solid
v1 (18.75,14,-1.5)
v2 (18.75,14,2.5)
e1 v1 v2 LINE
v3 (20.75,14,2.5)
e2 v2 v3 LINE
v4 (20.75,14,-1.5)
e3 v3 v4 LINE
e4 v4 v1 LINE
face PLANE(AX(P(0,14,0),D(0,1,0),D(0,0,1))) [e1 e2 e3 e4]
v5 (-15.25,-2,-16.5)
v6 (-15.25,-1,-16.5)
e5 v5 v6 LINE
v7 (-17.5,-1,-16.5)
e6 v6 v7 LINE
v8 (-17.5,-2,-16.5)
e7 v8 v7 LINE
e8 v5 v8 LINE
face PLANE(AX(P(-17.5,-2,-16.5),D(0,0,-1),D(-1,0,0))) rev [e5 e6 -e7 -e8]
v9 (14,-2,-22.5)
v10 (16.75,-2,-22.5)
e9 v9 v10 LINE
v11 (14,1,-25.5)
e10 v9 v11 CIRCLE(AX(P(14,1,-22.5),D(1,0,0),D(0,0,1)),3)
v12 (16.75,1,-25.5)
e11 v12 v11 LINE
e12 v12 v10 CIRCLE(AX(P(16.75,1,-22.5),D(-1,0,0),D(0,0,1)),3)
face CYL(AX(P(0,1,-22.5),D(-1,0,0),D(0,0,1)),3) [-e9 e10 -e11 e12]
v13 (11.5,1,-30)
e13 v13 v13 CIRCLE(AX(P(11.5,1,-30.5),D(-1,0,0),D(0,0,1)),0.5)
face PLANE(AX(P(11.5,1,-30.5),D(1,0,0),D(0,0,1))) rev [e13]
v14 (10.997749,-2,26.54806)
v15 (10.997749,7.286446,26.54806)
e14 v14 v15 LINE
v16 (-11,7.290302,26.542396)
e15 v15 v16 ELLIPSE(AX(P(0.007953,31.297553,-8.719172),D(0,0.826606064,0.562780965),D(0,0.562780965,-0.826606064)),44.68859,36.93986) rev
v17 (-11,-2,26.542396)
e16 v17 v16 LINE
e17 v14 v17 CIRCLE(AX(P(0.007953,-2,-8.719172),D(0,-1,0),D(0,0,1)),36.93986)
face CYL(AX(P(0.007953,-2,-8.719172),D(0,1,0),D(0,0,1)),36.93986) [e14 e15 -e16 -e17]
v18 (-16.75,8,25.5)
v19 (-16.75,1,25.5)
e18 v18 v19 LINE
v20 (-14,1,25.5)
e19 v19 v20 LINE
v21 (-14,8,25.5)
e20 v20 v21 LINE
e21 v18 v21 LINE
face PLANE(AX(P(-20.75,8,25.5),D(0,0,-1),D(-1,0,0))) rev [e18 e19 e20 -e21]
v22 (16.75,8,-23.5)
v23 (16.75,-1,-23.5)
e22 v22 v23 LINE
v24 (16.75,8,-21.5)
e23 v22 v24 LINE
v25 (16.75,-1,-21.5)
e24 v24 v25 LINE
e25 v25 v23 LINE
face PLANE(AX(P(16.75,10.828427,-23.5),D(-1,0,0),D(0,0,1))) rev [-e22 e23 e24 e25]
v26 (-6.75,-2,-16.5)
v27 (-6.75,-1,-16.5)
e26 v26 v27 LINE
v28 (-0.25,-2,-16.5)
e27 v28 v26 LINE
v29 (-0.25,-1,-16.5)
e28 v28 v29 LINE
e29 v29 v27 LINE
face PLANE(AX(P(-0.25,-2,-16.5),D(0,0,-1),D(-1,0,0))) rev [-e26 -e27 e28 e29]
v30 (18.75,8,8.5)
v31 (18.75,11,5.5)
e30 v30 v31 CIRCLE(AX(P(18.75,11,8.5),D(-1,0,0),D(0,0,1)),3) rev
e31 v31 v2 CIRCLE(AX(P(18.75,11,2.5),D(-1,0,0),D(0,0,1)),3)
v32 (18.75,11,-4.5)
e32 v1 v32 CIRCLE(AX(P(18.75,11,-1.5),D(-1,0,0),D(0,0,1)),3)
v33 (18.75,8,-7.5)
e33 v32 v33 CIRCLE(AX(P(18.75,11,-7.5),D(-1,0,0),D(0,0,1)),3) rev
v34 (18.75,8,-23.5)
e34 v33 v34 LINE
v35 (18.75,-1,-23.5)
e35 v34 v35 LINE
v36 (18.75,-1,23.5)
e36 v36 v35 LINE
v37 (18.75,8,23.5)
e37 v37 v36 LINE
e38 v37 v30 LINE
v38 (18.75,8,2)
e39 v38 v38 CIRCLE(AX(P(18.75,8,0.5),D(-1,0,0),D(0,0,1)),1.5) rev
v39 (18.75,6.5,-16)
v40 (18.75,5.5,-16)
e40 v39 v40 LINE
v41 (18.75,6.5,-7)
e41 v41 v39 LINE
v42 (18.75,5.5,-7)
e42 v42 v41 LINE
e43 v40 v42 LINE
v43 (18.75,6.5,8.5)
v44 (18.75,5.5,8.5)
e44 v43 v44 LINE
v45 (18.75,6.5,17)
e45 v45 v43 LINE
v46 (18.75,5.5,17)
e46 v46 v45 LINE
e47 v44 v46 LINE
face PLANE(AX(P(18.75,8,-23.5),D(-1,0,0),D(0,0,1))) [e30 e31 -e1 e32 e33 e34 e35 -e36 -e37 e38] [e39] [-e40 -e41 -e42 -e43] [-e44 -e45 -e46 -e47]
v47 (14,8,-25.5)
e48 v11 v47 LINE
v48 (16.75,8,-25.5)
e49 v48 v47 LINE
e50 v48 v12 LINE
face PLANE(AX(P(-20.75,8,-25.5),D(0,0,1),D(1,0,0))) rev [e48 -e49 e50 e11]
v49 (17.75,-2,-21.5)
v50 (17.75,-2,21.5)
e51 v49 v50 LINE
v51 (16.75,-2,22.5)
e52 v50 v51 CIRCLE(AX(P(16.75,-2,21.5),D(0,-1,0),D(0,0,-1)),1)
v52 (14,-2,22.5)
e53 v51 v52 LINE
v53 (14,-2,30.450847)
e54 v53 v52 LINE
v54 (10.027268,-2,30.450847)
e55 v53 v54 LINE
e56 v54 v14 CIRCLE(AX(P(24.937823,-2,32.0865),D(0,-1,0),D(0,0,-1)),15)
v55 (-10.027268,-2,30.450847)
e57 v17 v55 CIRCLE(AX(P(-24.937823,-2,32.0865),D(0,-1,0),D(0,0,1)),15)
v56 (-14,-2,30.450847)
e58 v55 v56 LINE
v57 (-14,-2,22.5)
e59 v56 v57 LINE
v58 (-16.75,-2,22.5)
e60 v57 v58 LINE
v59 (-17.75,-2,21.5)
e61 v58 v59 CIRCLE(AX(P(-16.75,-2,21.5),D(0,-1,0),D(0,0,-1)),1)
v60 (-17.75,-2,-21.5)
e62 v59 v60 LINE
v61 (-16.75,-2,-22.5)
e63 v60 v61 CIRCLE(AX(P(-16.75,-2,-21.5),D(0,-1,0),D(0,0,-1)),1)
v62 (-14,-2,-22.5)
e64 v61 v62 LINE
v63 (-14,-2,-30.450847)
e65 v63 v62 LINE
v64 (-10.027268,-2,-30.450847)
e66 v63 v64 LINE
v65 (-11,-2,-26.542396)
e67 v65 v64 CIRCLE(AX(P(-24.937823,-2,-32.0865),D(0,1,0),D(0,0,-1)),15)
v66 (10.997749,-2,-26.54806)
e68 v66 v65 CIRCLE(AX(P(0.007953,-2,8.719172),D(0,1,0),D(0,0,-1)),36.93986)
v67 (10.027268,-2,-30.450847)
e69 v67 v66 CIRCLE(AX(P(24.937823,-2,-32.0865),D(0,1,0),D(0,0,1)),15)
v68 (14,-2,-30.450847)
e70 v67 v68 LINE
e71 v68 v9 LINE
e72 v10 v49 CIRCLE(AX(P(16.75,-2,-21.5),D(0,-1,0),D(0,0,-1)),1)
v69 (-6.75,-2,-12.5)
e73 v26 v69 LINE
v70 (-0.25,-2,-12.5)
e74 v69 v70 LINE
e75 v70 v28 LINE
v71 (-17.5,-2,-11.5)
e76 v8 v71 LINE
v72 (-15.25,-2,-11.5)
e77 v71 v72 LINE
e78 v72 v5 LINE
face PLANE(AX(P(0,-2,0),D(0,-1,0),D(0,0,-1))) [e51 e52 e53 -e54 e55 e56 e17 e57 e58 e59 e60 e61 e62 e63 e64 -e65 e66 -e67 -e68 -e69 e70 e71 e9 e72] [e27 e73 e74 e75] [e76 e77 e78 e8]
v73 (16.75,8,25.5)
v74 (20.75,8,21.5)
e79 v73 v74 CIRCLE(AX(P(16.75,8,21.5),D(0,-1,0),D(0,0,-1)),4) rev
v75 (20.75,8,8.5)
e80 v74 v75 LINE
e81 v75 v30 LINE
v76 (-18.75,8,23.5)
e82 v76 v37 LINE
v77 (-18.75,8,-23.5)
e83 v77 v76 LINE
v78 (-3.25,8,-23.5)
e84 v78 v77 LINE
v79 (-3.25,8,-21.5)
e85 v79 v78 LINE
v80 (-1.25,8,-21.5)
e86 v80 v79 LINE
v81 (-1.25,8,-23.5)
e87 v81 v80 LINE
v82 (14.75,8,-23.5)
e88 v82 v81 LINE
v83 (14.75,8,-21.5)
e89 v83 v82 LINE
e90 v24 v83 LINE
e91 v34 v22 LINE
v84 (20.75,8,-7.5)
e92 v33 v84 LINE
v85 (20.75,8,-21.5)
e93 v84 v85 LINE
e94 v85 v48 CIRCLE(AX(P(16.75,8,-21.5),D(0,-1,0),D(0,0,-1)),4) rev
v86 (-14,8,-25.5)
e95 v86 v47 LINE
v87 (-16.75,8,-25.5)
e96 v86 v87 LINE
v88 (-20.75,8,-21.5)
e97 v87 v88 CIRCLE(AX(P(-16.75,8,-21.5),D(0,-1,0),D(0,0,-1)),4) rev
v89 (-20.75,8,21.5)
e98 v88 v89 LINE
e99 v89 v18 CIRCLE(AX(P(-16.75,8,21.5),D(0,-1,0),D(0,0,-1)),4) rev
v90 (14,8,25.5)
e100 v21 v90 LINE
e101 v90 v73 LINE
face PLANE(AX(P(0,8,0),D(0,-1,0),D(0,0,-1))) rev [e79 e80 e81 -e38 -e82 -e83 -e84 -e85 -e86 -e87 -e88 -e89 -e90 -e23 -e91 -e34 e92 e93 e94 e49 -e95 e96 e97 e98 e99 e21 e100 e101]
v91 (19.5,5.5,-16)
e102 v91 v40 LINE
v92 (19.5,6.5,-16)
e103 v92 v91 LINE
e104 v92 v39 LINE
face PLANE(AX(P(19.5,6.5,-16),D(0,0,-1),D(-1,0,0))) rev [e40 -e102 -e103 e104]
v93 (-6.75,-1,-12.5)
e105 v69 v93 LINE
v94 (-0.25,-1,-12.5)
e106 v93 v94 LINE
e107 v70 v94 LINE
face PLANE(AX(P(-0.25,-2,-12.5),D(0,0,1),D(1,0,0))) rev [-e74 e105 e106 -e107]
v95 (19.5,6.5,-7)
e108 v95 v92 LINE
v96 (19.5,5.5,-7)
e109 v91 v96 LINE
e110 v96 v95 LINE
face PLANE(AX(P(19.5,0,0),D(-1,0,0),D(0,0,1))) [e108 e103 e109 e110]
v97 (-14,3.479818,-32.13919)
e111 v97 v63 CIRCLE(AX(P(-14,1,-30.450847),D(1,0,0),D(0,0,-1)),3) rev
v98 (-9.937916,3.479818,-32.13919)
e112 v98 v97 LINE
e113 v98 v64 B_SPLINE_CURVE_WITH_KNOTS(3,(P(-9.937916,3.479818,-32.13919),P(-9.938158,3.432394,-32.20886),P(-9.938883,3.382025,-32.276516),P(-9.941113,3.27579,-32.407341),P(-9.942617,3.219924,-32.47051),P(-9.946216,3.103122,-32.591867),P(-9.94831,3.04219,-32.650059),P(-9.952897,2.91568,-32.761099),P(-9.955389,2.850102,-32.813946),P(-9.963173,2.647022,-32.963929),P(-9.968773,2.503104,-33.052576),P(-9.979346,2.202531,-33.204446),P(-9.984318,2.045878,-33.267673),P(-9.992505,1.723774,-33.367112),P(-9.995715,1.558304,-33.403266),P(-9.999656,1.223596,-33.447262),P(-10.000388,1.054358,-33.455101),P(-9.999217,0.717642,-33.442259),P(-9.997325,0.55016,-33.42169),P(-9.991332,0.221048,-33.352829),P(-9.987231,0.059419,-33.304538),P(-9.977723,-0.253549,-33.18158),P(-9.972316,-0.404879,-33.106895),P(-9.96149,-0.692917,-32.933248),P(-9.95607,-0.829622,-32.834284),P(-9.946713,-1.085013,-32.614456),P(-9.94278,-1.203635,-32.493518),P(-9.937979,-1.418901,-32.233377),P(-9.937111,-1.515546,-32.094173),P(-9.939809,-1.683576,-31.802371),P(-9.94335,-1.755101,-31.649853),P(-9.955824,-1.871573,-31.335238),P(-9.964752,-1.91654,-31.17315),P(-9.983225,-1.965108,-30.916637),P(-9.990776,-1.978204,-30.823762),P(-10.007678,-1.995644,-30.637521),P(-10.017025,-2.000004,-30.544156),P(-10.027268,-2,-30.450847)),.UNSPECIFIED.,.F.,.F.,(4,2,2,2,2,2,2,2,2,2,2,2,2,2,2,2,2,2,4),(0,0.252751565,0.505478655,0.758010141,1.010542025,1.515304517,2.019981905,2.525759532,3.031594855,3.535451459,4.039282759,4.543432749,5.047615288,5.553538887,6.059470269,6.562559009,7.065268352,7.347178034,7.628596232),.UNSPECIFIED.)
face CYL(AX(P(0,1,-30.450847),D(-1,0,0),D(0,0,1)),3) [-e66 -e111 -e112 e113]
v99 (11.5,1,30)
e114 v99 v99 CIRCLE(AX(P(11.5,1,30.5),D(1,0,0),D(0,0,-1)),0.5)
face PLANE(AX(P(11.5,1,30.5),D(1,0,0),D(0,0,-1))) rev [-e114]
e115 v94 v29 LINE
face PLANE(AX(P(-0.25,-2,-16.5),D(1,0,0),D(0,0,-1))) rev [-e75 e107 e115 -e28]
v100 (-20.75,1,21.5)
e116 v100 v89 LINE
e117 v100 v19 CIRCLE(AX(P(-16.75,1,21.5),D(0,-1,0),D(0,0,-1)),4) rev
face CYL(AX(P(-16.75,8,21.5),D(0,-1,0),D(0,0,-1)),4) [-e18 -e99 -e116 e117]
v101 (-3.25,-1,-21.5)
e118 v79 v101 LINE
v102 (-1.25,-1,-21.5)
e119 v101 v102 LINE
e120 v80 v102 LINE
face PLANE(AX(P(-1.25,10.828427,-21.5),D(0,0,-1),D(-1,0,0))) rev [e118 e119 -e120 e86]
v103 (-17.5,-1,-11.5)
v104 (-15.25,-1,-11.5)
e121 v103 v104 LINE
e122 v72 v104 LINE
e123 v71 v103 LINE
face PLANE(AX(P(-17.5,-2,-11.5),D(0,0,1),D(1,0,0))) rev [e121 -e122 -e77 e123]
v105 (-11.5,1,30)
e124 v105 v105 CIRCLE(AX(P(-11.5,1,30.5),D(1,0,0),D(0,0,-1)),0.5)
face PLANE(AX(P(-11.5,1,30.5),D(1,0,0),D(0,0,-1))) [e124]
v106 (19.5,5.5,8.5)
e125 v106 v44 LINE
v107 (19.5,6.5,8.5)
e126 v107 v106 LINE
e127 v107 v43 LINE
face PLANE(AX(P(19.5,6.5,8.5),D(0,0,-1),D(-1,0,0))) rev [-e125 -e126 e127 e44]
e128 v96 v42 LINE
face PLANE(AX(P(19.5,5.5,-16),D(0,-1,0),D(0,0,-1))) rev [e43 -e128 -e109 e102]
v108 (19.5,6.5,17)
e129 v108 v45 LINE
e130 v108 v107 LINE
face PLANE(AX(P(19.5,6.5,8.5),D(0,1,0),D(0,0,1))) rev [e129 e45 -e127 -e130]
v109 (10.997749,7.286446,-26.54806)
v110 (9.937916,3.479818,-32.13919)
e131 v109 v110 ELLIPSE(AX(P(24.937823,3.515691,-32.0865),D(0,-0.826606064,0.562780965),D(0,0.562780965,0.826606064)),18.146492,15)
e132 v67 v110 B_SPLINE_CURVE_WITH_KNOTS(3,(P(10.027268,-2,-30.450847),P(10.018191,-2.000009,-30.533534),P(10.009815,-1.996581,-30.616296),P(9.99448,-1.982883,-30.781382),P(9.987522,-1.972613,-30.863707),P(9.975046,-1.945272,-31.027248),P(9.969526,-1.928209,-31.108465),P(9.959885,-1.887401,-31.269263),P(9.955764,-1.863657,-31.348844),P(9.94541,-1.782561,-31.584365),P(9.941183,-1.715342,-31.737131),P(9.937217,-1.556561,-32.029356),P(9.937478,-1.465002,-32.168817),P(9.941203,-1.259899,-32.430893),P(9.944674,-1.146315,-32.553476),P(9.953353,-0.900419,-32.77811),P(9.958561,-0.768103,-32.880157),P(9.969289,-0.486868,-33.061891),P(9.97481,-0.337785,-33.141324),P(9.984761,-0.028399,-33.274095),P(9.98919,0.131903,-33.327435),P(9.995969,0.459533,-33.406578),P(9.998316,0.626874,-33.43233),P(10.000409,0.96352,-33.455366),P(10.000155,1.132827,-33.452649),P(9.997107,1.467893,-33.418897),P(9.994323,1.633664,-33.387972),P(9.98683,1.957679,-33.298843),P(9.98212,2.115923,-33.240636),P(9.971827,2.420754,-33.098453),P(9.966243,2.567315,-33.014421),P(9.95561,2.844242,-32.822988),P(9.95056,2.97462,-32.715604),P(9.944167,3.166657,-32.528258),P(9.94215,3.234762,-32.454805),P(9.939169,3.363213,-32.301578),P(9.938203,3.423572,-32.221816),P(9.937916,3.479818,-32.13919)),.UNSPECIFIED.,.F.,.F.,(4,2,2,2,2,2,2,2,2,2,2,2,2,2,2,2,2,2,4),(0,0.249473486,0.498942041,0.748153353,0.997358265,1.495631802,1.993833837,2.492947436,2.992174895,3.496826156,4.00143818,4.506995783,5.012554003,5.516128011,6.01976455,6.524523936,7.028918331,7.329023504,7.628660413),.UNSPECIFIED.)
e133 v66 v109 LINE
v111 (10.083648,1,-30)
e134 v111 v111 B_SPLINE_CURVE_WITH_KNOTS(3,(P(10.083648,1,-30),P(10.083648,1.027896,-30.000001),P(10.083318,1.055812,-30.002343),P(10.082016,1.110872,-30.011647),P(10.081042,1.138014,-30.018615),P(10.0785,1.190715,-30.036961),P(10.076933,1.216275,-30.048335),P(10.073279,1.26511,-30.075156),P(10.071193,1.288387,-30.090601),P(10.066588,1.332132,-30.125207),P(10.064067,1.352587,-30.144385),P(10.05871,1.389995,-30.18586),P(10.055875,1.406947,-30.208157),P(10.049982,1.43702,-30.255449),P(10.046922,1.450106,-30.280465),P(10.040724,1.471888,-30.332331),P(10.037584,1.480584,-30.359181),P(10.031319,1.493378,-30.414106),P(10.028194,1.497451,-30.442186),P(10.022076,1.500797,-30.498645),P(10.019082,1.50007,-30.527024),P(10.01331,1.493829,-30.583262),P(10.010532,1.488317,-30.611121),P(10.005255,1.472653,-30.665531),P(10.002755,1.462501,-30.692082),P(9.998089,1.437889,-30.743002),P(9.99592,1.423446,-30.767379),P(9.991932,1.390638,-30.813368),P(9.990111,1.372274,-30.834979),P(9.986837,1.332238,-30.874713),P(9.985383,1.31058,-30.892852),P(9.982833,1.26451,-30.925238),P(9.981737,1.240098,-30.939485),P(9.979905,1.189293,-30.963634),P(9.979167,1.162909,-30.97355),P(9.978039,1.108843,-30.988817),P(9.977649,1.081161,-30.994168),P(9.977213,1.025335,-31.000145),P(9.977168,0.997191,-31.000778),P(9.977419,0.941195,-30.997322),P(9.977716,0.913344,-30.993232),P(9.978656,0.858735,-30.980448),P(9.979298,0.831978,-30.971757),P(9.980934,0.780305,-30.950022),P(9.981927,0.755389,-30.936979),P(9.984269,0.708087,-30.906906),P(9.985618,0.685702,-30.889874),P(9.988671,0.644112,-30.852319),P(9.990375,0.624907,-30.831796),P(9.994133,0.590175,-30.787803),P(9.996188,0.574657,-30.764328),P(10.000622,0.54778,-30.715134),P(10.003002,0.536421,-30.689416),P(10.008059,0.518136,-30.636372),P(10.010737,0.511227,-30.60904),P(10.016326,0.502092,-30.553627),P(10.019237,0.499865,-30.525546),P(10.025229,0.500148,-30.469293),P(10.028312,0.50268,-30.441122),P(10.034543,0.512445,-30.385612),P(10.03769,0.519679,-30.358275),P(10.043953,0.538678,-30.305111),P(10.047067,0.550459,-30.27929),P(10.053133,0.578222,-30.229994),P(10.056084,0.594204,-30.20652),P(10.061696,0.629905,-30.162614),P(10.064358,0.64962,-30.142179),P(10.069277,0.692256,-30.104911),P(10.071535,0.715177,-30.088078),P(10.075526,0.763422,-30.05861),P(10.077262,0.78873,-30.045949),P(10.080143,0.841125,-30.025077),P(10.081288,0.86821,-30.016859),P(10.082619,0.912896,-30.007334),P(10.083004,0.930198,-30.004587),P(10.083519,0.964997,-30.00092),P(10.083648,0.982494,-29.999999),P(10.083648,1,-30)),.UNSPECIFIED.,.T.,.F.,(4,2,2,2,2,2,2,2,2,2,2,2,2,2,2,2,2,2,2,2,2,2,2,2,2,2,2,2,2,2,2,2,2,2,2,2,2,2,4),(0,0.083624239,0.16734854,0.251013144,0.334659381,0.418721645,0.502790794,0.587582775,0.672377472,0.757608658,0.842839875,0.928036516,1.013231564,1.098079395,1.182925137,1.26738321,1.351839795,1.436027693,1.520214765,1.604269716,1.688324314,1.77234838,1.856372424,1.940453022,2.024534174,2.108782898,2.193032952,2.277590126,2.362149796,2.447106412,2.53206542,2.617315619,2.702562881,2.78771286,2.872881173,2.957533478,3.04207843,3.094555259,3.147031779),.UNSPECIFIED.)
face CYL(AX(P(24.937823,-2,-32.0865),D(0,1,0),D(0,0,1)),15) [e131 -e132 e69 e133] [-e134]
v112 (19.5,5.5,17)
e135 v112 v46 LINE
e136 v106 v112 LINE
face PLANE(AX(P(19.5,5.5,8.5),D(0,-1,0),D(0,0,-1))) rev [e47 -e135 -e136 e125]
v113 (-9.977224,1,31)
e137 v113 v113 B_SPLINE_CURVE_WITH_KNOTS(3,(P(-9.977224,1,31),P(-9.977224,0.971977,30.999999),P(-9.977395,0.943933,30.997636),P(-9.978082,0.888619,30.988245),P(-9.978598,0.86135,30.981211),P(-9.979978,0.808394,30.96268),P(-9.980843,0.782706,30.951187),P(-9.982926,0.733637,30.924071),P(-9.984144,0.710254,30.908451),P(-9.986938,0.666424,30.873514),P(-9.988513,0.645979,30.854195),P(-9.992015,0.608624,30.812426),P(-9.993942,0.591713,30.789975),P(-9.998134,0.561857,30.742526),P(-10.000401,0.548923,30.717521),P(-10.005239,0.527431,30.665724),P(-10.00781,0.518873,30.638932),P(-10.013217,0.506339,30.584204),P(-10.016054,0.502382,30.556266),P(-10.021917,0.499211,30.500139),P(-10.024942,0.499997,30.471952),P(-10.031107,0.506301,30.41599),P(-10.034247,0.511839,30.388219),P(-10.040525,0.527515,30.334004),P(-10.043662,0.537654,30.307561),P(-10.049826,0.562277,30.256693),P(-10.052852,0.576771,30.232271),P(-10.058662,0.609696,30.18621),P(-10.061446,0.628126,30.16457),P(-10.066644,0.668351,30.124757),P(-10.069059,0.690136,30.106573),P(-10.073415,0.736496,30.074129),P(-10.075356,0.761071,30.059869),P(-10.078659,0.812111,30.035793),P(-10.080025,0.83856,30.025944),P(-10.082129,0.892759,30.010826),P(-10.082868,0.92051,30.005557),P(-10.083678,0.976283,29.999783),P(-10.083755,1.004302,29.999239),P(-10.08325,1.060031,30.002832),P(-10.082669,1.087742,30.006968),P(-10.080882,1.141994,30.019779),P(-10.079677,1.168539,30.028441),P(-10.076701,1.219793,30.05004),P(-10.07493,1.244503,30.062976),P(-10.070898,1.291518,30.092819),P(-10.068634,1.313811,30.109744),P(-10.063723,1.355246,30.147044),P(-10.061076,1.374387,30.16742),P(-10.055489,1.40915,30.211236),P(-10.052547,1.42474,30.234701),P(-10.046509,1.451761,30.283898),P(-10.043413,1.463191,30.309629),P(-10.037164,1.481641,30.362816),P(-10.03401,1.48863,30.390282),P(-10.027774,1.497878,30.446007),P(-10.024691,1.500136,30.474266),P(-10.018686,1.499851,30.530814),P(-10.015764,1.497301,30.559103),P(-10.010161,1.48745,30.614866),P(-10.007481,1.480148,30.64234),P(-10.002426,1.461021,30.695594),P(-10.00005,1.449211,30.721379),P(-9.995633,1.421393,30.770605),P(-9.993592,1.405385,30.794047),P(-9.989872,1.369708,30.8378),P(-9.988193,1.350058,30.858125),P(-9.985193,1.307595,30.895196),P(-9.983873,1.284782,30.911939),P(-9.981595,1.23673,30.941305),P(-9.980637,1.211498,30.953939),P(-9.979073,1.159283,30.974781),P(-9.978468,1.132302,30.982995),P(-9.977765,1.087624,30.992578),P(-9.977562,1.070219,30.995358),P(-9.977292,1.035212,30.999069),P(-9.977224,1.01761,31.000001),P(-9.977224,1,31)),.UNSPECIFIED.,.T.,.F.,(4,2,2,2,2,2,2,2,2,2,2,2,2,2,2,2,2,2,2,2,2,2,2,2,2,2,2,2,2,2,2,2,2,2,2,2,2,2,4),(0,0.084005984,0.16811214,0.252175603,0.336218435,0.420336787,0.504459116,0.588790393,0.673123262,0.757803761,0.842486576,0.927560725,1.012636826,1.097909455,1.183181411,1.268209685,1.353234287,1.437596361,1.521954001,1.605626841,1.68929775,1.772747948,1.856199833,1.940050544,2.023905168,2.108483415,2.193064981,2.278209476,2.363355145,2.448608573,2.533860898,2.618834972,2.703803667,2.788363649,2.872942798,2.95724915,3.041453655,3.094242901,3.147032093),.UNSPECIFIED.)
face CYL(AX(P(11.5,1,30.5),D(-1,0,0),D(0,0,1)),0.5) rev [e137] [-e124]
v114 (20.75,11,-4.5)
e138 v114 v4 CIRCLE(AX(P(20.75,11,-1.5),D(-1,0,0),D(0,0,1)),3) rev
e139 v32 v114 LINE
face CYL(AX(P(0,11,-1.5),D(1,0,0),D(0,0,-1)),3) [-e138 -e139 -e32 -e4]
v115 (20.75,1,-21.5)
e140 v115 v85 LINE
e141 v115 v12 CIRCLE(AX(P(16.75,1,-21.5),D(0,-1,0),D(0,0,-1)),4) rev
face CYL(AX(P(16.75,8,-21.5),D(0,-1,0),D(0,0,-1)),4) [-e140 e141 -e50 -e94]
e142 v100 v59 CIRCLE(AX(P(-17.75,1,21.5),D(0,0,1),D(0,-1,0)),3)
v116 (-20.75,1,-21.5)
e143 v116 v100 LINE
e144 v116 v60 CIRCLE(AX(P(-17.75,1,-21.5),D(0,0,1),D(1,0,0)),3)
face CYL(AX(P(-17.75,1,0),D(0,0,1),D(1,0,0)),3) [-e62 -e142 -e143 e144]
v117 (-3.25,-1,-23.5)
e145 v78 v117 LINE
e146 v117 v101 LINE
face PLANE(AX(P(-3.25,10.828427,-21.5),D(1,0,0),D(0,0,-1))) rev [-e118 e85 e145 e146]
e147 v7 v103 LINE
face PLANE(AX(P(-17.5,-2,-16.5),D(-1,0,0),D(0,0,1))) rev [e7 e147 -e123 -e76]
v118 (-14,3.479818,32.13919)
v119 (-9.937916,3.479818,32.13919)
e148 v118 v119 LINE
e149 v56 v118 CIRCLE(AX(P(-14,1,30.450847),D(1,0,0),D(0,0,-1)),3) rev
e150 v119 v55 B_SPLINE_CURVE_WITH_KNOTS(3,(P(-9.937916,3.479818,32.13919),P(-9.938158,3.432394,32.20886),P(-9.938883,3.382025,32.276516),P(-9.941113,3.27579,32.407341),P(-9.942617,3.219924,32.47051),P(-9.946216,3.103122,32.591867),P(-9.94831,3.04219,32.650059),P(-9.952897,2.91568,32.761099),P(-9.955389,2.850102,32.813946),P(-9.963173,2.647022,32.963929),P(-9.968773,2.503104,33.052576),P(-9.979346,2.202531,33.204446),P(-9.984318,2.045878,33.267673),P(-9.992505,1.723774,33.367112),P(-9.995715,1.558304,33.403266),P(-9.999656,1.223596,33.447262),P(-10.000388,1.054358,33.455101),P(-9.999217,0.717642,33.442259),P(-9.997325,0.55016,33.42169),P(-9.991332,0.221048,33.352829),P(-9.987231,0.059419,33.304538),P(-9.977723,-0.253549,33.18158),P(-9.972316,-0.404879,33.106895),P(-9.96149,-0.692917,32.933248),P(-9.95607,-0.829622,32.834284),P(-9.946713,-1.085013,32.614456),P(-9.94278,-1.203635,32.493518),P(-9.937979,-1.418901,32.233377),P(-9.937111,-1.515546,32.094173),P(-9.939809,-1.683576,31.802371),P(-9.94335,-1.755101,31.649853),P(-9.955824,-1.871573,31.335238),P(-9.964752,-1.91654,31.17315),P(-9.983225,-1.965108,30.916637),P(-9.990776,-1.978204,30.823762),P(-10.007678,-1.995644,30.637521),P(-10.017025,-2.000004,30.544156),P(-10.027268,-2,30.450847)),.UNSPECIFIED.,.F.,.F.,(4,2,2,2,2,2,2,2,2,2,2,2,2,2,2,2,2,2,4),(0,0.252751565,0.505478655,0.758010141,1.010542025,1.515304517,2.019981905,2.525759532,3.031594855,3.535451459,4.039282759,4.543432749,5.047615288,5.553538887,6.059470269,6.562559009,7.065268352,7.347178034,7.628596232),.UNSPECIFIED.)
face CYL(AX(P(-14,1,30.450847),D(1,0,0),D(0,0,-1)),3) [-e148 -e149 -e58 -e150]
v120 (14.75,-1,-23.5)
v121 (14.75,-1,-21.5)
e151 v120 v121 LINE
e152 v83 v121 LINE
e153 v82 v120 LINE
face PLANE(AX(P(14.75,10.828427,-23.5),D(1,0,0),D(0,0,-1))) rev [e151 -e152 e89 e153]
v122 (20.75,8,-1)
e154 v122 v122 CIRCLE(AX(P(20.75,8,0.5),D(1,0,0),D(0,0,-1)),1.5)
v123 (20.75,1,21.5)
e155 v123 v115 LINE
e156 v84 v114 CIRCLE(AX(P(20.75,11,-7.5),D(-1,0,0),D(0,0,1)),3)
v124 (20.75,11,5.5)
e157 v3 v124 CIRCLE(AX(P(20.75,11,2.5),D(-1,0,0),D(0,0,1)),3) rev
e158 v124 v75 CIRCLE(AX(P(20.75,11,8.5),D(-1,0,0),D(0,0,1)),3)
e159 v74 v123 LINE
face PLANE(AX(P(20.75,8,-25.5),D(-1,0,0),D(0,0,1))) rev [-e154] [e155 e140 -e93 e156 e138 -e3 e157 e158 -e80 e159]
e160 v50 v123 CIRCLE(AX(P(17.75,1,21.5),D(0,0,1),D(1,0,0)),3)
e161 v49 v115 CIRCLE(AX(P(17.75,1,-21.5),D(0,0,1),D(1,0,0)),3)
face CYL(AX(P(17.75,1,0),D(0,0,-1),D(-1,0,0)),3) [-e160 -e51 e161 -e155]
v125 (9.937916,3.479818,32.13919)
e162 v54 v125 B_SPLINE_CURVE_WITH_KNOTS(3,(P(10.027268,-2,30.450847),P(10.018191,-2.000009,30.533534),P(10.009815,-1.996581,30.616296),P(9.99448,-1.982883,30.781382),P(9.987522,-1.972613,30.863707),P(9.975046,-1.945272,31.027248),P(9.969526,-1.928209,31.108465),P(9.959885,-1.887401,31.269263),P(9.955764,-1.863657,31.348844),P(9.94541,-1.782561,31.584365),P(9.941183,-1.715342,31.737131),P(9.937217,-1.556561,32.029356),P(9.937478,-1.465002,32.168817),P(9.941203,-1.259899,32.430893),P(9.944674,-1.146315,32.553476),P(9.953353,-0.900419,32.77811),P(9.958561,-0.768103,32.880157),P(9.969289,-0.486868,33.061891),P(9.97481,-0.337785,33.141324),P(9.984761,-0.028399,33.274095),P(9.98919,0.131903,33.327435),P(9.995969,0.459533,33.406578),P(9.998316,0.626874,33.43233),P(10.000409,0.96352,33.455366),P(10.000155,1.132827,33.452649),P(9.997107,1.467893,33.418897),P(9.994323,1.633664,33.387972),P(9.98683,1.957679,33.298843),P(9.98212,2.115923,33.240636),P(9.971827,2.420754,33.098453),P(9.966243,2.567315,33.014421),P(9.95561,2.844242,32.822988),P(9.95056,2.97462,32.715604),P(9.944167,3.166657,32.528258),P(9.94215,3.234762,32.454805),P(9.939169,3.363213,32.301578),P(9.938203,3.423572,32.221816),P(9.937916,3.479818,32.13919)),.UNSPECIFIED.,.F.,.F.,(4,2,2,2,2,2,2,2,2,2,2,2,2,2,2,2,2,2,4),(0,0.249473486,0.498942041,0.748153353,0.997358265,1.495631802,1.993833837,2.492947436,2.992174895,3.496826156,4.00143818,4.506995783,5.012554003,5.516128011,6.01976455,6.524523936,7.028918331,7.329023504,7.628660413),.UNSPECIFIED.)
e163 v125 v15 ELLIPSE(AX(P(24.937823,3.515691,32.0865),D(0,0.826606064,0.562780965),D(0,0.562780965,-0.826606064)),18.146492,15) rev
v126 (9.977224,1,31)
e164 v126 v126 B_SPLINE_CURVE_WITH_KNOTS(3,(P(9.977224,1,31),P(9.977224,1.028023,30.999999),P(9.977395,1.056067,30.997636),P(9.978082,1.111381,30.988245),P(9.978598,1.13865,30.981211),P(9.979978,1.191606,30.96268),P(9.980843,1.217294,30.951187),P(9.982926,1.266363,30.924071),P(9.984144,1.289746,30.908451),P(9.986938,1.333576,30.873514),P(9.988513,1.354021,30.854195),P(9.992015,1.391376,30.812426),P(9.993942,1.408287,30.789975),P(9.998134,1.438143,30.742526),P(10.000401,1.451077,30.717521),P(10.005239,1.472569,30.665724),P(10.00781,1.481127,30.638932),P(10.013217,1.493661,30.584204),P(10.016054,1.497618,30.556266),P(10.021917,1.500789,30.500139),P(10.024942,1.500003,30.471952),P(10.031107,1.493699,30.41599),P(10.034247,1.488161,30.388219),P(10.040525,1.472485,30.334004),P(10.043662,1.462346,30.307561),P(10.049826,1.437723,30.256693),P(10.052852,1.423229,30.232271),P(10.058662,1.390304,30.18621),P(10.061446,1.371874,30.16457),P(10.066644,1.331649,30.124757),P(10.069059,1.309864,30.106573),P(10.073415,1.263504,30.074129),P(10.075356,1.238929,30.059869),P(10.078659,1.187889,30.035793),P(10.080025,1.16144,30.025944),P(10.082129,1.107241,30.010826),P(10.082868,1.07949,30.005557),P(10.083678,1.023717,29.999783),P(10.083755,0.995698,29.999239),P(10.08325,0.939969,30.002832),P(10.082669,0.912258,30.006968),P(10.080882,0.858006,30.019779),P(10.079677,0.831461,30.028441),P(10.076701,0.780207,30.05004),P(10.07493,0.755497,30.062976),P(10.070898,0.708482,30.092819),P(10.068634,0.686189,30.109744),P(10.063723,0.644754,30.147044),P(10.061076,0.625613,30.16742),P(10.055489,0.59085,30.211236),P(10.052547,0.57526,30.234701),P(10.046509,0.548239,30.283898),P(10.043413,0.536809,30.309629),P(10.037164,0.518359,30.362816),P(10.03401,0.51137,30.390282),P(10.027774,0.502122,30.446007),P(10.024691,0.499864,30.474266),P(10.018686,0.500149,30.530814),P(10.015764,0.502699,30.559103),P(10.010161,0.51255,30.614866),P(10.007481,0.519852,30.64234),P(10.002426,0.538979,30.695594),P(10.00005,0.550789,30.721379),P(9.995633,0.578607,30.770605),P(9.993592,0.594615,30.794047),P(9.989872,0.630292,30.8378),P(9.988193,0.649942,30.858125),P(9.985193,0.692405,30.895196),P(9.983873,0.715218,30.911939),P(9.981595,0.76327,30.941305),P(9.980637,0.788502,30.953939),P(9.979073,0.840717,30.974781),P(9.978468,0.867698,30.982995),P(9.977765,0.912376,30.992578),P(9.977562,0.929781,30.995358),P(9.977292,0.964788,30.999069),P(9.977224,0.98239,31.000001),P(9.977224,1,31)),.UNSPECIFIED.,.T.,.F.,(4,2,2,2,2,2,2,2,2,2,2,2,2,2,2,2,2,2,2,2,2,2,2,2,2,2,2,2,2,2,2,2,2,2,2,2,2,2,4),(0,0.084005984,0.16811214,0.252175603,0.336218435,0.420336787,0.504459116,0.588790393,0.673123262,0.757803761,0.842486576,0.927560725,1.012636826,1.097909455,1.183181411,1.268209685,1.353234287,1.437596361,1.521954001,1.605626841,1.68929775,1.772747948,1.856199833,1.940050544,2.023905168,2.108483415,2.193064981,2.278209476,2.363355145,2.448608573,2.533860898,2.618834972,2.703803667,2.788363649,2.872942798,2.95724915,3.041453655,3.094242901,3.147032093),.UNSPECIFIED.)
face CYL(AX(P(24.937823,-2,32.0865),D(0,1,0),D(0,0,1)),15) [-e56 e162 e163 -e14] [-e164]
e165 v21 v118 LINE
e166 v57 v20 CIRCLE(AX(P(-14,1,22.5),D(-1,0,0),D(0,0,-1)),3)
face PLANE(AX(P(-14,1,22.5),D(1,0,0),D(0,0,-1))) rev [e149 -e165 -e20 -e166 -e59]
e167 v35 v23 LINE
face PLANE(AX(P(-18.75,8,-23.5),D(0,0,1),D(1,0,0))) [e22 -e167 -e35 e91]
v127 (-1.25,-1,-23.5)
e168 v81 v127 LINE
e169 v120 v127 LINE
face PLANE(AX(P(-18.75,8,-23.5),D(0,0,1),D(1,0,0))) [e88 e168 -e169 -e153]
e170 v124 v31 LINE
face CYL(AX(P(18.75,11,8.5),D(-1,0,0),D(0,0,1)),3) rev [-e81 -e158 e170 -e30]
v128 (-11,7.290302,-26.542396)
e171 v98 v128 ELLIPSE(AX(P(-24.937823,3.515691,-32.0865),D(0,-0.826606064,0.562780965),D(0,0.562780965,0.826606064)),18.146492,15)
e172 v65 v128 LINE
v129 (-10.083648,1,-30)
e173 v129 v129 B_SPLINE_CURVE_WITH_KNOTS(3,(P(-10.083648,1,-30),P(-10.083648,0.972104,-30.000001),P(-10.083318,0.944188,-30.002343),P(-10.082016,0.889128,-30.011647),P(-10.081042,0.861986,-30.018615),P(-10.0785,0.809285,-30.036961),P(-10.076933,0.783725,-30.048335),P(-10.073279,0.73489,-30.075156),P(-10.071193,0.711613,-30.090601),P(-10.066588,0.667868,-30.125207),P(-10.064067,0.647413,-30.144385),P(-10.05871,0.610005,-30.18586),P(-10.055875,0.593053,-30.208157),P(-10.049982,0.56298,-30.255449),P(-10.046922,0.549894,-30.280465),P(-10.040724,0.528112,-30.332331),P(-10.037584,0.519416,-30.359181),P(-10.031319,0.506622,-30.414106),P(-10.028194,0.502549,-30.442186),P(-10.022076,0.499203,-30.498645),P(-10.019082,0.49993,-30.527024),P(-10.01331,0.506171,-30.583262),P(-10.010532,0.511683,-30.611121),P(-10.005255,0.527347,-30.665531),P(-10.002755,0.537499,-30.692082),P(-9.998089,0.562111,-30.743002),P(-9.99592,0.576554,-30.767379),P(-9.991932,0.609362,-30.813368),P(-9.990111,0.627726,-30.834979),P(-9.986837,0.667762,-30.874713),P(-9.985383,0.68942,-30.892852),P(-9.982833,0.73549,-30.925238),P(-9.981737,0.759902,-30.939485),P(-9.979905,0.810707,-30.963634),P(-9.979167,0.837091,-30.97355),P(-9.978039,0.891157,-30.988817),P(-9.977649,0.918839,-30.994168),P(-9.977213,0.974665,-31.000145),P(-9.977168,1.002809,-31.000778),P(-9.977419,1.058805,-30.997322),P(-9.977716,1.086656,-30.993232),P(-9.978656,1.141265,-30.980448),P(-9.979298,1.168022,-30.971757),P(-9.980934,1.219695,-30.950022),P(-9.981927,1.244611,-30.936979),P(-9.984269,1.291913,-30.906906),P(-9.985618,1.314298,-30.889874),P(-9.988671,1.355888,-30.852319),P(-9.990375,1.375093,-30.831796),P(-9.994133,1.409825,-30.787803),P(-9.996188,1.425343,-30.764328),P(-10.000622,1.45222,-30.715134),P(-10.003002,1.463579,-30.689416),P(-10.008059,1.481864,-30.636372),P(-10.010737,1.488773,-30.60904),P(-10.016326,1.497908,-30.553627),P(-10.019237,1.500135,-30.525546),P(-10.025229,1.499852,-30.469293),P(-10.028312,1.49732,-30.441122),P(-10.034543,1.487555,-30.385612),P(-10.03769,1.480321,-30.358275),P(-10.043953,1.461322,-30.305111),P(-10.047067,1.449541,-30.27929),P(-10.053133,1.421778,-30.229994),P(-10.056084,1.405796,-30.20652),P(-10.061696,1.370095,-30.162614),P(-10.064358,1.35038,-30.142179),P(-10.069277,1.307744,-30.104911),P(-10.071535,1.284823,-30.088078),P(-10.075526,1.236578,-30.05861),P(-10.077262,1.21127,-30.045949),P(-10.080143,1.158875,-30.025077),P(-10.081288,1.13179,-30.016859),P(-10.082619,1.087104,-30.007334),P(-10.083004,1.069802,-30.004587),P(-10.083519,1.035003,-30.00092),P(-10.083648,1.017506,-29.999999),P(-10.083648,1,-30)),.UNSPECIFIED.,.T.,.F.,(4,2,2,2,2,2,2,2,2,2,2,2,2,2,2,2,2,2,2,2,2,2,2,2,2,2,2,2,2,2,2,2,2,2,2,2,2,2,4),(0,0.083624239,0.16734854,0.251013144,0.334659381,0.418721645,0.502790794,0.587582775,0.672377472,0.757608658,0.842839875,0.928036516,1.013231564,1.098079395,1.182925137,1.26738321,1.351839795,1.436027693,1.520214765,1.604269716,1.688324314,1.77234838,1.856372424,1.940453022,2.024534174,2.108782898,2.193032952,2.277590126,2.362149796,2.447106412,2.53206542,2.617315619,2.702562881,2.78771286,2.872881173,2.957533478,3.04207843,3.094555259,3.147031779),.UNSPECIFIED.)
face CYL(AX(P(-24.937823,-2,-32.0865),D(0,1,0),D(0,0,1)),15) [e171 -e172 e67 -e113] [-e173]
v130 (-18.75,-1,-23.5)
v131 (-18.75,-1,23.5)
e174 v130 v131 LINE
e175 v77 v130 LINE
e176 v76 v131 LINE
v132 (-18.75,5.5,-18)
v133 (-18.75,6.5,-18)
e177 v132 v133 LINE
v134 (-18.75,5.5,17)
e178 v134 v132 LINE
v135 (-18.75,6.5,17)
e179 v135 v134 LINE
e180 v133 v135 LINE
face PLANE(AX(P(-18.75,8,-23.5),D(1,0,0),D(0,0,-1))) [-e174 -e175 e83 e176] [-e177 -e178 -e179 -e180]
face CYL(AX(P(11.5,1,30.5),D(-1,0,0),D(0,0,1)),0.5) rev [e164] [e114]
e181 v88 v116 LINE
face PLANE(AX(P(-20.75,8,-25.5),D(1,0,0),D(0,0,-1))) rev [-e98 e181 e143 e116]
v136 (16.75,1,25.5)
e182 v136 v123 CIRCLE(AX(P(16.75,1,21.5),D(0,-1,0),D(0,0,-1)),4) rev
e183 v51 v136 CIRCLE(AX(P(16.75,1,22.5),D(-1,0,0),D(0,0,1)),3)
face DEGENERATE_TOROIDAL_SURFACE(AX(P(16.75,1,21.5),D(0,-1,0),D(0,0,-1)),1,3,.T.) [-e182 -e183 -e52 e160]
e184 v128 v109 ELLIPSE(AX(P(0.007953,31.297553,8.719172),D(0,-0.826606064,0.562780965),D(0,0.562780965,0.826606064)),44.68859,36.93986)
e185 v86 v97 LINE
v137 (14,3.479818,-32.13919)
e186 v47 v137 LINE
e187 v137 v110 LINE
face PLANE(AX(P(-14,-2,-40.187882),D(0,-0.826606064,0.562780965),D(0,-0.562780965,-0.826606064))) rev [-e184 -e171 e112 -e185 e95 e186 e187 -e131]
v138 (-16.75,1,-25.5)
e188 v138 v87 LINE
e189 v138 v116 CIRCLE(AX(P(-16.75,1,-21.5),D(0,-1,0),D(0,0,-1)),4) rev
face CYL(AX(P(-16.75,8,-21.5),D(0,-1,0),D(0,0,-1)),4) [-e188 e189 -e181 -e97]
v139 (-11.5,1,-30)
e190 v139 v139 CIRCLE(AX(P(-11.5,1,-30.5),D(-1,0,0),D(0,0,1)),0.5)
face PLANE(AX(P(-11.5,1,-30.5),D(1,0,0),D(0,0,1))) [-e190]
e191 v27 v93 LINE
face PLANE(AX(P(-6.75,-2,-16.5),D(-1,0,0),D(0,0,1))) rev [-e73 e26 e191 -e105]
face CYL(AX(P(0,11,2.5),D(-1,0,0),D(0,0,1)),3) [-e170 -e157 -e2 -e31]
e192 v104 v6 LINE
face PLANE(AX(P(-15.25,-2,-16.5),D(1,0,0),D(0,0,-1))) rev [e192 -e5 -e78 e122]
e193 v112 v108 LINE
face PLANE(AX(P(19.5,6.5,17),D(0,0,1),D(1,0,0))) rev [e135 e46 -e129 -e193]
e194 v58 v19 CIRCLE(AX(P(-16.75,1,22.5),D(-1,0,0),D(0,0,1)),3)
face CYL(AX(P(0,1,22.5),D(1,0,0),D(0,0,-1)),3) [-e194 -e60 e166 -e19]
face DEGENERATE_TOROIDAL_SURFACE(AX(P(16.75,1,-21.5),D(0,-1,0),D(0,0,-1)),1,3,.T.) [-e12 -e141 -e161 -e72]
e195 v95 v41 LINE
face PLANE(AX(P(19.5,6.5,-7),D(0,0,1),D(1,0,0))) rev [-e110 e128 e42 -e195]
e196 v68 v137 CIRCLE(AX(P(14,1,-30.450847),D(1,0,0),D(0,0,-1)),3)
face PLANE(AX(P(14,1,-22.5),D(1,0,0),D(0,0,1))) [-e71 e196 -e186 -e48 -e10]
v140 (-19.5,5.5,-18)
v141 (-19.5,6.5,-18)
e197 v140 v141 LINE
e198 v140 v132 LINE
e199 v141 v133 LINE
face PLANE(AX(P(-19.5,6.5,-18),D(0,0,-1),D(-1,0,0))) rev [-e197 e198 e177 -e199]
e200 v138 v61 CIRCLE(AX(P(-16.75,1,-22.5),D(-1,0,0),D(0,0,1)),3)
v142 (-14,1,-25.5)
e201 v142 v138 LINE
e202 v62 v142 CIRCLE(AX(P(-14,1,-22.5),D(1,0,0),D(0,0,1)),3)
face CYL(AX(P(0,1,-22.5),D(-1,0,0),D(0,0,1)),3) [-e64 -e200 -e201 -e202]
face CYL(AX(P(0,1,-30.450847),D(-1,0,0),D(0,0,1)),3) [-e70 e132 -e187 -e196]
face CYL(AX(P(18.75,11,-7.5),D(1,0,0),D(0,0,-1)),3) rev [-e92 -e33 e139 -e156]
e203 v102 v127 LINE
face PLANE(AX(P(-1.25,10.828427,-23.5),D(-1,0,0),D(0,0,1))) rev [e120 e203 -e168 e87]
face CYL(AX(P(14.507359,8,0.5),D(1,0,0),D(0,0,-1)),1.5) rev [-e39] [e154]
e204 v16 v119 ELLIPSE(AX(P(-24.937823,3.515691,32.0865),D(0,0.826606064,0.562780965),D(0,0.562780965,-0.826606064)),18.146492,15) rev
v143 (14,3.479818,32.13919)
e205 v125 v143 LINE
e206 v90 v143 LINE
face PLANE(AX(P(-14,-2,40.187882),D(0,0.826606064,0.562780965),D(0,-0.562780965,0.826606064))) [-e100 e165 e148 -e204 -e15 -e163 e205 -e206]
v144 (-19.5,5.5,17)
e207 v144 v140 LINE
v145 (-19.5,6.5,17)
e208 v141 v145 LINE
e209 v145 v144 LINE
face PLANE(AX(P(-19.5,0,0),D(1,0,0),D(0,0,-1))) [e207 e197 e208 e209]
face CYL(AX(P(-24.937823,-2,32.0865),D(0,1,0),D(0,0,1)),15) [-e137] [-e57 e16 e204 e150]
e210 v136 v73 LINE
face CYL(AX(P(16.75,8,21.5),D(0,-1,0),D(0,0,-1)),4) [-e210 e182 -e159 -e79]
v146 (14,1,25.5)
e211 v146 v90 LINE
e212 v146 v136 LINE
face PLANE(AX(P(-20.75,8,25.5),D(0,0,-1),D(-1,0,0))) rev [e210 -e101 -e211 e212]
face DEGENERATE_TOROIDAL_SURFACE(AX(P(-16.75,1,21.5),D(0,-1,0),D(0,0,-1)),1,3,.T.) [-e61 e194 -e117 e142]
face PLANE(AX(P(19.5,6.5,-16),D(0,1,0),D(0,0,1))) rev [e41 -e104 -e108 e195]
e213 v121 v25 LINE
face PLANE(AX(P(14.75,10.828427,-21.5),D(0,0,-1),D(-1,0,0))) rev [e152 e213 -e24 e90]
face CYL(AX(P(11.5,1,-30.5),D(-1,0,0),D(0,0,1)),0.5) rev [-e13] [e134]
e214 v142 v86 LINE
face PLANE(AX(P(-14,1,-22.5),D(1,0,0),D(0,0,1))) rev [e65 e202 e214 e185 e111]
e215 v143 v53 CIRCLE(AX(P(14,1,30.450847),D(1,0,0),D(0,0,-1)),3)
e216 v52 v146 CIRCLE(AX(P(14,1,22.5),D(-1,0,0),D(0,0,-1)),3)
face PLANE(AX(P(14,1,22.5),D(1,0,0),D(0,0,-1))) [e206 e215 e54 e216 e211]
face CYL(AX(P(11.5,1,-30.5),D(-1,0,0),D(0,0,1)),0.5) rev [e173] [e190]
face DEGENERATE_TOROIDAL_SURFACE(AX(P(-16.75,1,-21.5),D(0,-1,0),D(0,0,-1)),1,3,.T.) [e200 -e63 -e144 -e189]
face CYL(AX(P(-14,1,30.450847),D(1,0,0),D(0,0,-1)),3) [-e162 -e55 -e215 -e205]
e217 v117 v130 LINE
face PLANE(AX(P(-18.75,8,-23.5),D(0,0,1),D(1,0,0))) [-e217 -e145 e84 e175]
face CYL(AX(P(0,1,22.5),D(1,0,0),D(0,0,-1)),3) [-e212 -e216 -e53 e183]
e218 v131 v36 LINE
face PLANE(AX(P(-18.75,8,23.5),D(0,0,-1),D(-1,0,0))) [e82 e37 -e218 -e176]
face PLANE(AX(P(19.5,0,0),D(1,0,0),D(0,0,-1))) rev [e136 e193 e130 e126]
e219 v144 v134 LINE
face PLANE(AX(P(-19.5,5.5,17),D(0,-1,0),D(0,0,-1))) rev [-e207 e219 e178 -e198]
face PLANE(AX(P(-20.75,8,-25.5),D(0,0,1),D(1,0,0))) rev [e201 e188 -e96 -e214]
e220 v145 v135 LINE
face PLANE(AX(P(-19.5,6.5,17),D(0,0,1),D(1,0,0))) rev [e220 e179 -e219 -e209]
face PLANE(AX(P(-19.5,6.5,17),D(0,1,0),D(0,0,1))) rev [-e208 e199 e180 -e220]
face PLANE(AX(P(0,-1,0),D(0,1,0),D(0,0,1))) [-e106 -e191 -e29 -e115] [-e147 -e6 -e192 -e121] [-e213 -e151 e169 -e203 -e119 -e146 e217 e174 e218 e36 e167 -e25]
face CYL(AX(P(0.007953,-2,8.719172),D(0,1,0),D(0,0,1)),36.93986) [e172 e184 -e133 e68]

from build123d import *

# Parameters (mm, degrees)
SKETCH1_W            = 41.5
SKETCH1_H            = 51
SKETCH1_W_2          = 37.5
SKETCH1_H_2          = 47
BOSS_EXTRUDE1_DEPTH  = 8
SKETCH2_W            = 41.5
SKETCH2_H            = 51
BOSS_EXTRUDE2_DEPTH  = 2
FILLET1_R            = 4
FILLET2_R            = 3
SKETCH3_W            = 5.5
SKETCH3_H            = 20
BOSS_EXTRUDE3_DEPTH  = 6
SKETCH4_R            = 1.4
BOSS_EXTRUDE4_DEPTH  = 3.5
FILLET3_R            = 0.5
SKETCH5_W            = 6.5
SKETCH5_H            = 4
CUT_EXTRUDE1_DEPTH   = 34.835077952
SKETCH6_W            = 2
SKETCH6_H            = 10
BOSS_EXTRUDE6_DEPTH  = 6
FILLET4_R            = 3
SKETCH7_R            = 1.5
CUT_EXTRUDE2_DEPTH   = 2
SKETCH8_W            = 35
SKETCH8_H            = 1
CUT_EXTRUDE3_DEPTH   = 0.75
SKETCH9_W            = 9
SKETCH9_H            = 1
SKETCH9_W_2          = 8.5
CUT_EXTRUDE4_DEPTH   = 0.75
BOSS_EXTRUDE7_DEPTH  = 14
FILLET6_R            = 3
CUT_EXTRUDE5_DEPTH   = 42.779440692
MIRROR1_START        = 10.997748531
MIRROR1_DEPTH        = 3.002251469
MIRROR1_START_2      = -14
MIRROR1_2_DEPTH      = 2.9999999
MIRROR1_START_3      = -11.0000001
MIRROR1_3_DEPTH      = 21.997748631
MIRROR1_START_4      = -3
MIRROR1_4_DEPTH      = 10.290302021
SKETCH13_R           = 0.5
CUT_EXTRUDE6_DEPTH   = 11.5
CUT_EXTRUDE7_DEPTH   = 6
SKETCH15_W           = 4.2
SKETCH15_H           = 10.25
CUT_EXTRUDE8_DEPTH   = 42.779440772
SKETCH16_R           = 1.75
SKETCH16_R_2         = 0.5
BOSS_EXTRUDE8_DEPTH  = 3
CUT_EXTRUDE9_START   = -1
SKETCH17_W           = 37.5
SKETCH17_H           = 47
SKETCH17_R           = 1.75
SKETCH17_R_2         = 1.4
SKETCH17_W_2         = 4.2
SKETCH17_H_2         = 10.25
SKETCH17_W_3         = 6.5
SKETCH17_H_3         = 4
CUT_EXTRUDE9_DEPTH   = 1
CUT_EXTRUDE10_START  = -4.5
SKETCH18_R           = 1.4
CUT_EXTRUDE10_DEPTH  = 4.5
SKETCH19_W           = 4.2
SKETCH19_H           = 10.25
BOSS_EXTRUDE9_DEPTH  = 1
CUT_EXTRUDE11_START  = -4
SKETCH20_R           = 1.75
CUT_EXTRUDE11_DEPTH  = 4
SKETCH23_W           = 2.25
SKETCH23_H           = 5
CUT_EXTRUDE12_DEPTH  = 43.125071765
SKETCH26_W           = 2
SKETCH26_H           = 2
BOSS_EXTRUDE10_DEPTH = 9


with BuildPart() as part:
    # Sketch1 → Boss-Extrude1 (new body)
    with BuildSketch(Plane(origin=(0, 0, 0), x_dir=(1, 0, 0), z_dir=(0, 1, 0))):
        Rectangle(SKETCH1_W, SKETCH1_H)
        Rectangle(SKETCH1_W_2, SKETCH1_H_2, mode=Mode.SUBTRACT)
    extrude(amount=BOSS_EXTRUDE1_DEPTH)

    # Sketch2 → Boss-Extrude2 (add)
    with BuildSketch(Plane.XZ):
        Rectangle(SKETCH2_W, SKETCH2_H)
    extrude(amount=BOSS_EXTRUDE2_DEPTH)

    # Fillet1
    fillet1_edges = [part.edges().sort_by_distance(p)[0] for p in [
        (20.75, 3, -25.5),
        (20.75, 3, 25.5),
        (-20.75, 3, 25.5),
        (-20.75, 3, -25.5),
    ]]
    fillet(fillet1_edges, radius=FILLET1_R)

    # Fillet2
    fillet2_edges = [part.edges().sort_by_distance(p)[0] for p in [
        (-20.75, -2, 0),
        (0, -2, -25.5),
        (20.75, -2, 0),
        (0, -2, 25.5),
        (19.578427125, -2, -24.328427125),
        (19.578427125, -2, 24.328427125),
        (-19.578427125, -2, 24.328427125),
        (-19.578427125, -2, -24.328427125),
    ]]
    fillet(fillet2_edges, radius=FILLET2_R)

    # Sketch3 → Boss-Extrude3 (add)
    with BuildSketch(Plane(origin=(0, 0, 0), x_dir=(1, 0, 0), z_dir=(0, 1, 0))):
        with Locations((16, 13.5)):
            Rectangle(SKETCH3_W, SKETCH3_H)
    extrude(amount=BOSS_EXTRUDE3_DEPTH)

    # Sketch4 → Boss-Extrude4 (add)
    with BuildSketch(Plane(origin=(0, 0, 0), x_dir=(1, 0, 0), z_dir=(0, 1, 0))):
        with Locations(Location((0.245140852, 21.1, 0), (0, 0, 90))):
            Circle(SKETCH4_R)
        with Locations(Location((0.245140852, 6.1, 0), (0, 0, 90))):
            Circle(SKETCH4_R)
    extrude(amount=BOSS_EXTRUDE4_DEPTH)

    # Fillet3
    fillet3_edges = [part.edges().sort_by_distance(p)[0] for p in [
        (0.245140852, 3.5, -19.7),
        (0.245140852, 3.5, -4.7),
    ]]
    fillet(fillet3_edges, radius=FILLET3_R)

    # Sketch5 → Cut-Extrude1 (cut, through all)
    with BuildSketch(Plane(origin=(0, 0, 0), x_dir=(1, 0, 0), z_dir=(0, 1, 0))):
        with Locations((-3.5, 14.5)):
            Rectangle(SKETCH5_W, SKETCH5_H)
    extrude(amount=-CUT_EXTRUDE1_DEPTH, mode=Mode.SUBTRACT)

    # Sketch6 → Boss-Extrude6 (add)
    with BuildSketch(Plane(origin=(0, 8, 0), x_dir=(1, 0, 0), z_dir=(0, 1, 0))):
        with Locations((19.75, -0.5)):
            Rectangle(SKETCH6_W, SKETCH6_H)
    extrude(amount=BOSS_EXTRUDE6_DEPTH)

    # Fillet4
    fillet4_edges = [part.edges().sort_by_distance(p)[0] for p in [
        (19.75, 8, -4.5),
    ]]
    fillet(fillet4_edges, radius=FILLET4_R)
    fillet4_2_edges = [part.edges().sort_by_distance(p)[0] for p in [
        (19.75, 8, 5.5),
    ]]
    fillet(fillet4_2_edges, radius=FILLET4_R)
    fillet4_3_edges = [part.edges().sort_by_distance(p)[0] for p in [
        (19.75, 14, -4.5),
    ]]
    fillet(fillet4_3_edges, radius=FILLET4_R - 0.0001)  # a hair under: the kernel refuses the full size
    fillet4_4_edges = [part.edges().sort_by_distance(p)[0] for p in [
        (19.75, 14, 5.5),
    ]]
    fillet(fillet4_4_edges, radius=FILLET4_R - 0.0001)  # a hair under: the kernel refuses the full size

    # Sketch7 → Cut-Extrude2 (cut)
    with BuildSketch(Plane(origin=(20.75, 0, 0), x_dir=(0, 0, -1), z_dir=(1, 0, 0))):
        with Locations((-0.5, 8)):
            Circle(SKETCH7_R)
    extrude(amount=-CUT_EXTRUDE2_DEPTH, mode=Mode.SUBTRACT)

    # Sketch8 → Cut-Extrude3 (cut)
    with BuildSketch(Plane(origin=(-18.75, 0, 0), x_dir=(0, 0, -1), z_dir=(1, 0, 0))):
        with Locations((0.5, 6)):
            Rectangle(SKETCH8_W, SKETCH8_H)
    extrude(amount=-CUT_EXTRUDE3_DEPTH, mode=Mode.SUBTRACT)

    # Sketch9 → Cut-Extrude4 (cut)
    with BuildSketch(Plane.ZY.offset(-18.75)):
        with Locations((-11.5, 6)):
            Rectangle(SKETCH9_W, SKETCH9_H)
        with Locations((12.75, 6)):
            Rectangle(SKETCH9_W_2, SKETCH9_H)
    extrude(amount=-CUT_EXTRUDE4_DEPTH, mode=Mode.SUBTRACT)

    # Sketch10 → Boss-Extrude7 (add, symmetric)
    with BuildSketch(Plane(origin=(0, 0, 0), x_dir=(0, 0, -1), z_dir=(1, 0, 0))):
        with BuildLine():
            Line((-40.187882415, -2), (-25.5, 8))
            Line((-25.5, 8), (-25.5, 1))
            ThreePointArc((-25.5, 1), (-24.621320344, -1.121320344), (-22.5, -2))
            Line((-22.5, -2), (-40.187882415, -2))
        make_face()
    extrude(amount=BOSS_EXTRUDE7_DEPTH, both=True)

    # Fillet6
    fillet6_edges = [part.edges().sort_by_distance(p)[0] for p in [
        (0, -2, 40.187882415),
    ]]
    fillet(fillet6_edges, radius=FILLET6_R)

    # Sketch12 → Cut-Extrude5 (cut, symmetric)
    with BuildSketch(Plane(origin=(0, 0, 0), x_dir=(1, 0, 0), z_dir=(0, 1, 0))):
        with BuildLine():
            ThreePointArc((-10, -33.450846993), (-10.0925407, -29.937641684), (-11, -26.542396046))
            ThreePointArc((-11, -26.542396046), (-0.001557097, -28.220686258), (10.997748531, -26.548059567))
            ThreePointArc((10.997748531, -26.548059567), (10.092104456, -29.940657614), (10, -33.450846993))
            ThreePointArc((10, -33.450846993), (0, -35.763467262), (-10, -33.450846993))
        make_face()
    extrude(amount=CUT_EXTRUDE5_DEPTH, both=True, mode=Mode.SUBTRACT)

    # Mirror1: read off the stored shape, not the designer's step
    # Mirror1 outline → Mirror1 (add)
    with BuildSketch(Plane.YZ.offset(MIRROR1_START)):
        with BuildLine():
            ThreePointArc((1, -25.5), (-1.121320344, -24.621320344), (-2, -22.5))
            Line((-2, -22.5), (-2, -30.450846993))
            ThreePointArc((-2, -30.450846993), (0.116669534, -33.31785367), (3.479818192, -32.139189888))
            Line((3.479818192, -32.139189888), (8, -25.5))
            Line((8, -25.5), (1, -25.5))
        make_face()
    extrude(amount=MIRROR1_DEPTH)

    # Mirror1 2 outline → Mirror1 2 (add)
    with BuildSketch(Plane.YZ.offset(MIRROR1_START_2)):
        with BuildLine():
            ThreePointArc((1, -25.5), (-1.121320344, -24.621320344), (-2, -22.5))
            Line((-2, -22.5), (-2, -30.450846993))
            ThreePointArc((-2, -30.450846993), (0.116669534, -33.31785367), (3.479818192, -32.139189888))
            Line((3.479818192, -32.139189888), (8, -25.5))
            Line((8, -25.5), (1, -25.5))
        make_face()
    extrude(amount=MIRROR1_2_DEPTH)

    # Mirror1 3 outline → Mirror1 3 (add)
    with BuildSketch(Plane.YZ.offset(MIRROR1_START_3)):
        with BuildLine():
            ThreePointArc((1.000000002, -25.5), (-1.121320344, -24.621320344), (-2, -22.499999998))
            Line((-2, -22.499999998), (-2, -30.450846993))
            ThreePointArc((-2, -30.450846993), (0.116669534, -33.31785367), (3.479818192, -32.139189888))
            Line((3.479818192, -32.139189888), (8, -25.5))
            Line((8, -25.5), (1.000000002, -25.5))
        make_face()
    extrude(amount=MIRROR1_3_DEPTH)

    # Mirror1 4 outline → Mirror1 4 (cut)
    with BuildSketch(Plane(origin=(0, 0, 0), x_dir=(1, 0, 0), z_dir=(0, 1, 0)).offset(MIRROR1_START_4)):
        with BuildLine():
            ThreePointArc((-11, 26.542396046), (-0.001557097, 28.220686258), (10.997748531, 26.548059567))
            ThreePointArc((10.997748531, 26.548059567), (10.092086007, 29.940785259), (10.000023464, 33.451103865))
            Line((10.000023464, 33.451103865), (10.141518844, 35))
            Line((10.141518844, 35), (-10.141519787, 35))
            Line((-10.141519787, 35), (-10.000024287, 33.451112878))
            ThreePointArc((-10.000024287, 33.451112878), (-10.092521576, 29.937773803), (-11, 26.542396046))
        make_face()
    extrude(amount=MIRROR1_4_DEPTH, mode=Mode.SUBTRACT)

    # Sketch13 → Cut-Extrude6 (cut, symmetric)
    with BuildSketch(Plane(origin=(0, 0, 0), x_dir=(0, 0, -1), z_dir=(1, 0, 0))):
        with Locations(Location((-30.5, 1, 0), (0, 0, 180))):
            Circle(SKETCH13_R)
    cut_extrude6 = extrude(amount=CUT_EXTRUDE6_DEPTH, both=True, mode=Mode.SUBTRACT)

    # Mirror2: Cut-Extrude6 across plane
    add(cut_extrude6.mirror(Plane.XY), mode=Mode.SUBTRACT)

    # Sketch14 → Cut-Extrude7 (cut)
    with BuildSketch(Plane(origin=(0, 6, 0), x_dir=(1, 0, 0), z_dir=(0, 1, 0))):
        Polygon((18.75, 23.5), (13.25, 23.5), (13.25, 3.5), (18.75, 3.5), (18.75, 7), (18.75, 16), align=None)
    extrude(amount=-CUT_EXTRUDE7_DEPTH, mode=Mode.SUBTRACT)

    # Sketch15 → Cut-Extrude8 (cut, through all)
    with BuildSketch(Plane(origin=(0, 0, 0), x_dir=(1, 0, 0), z_dir=(0, 1, 0))):
        with Locations((14.15, 13.375)):
            Rectangle(SKETCH15_W, SKETCH15_H)
    extrude(amount=-CUT_EXTRUDE8_DEPTH, mode=Mode.SUBTRACT)

    # Sketch16 → Boss-Extrude8 (add)
    with BuildSketch(Plane(origin=(0, 0, 0), x_dir=(1, 0, 0), z_dir=(0, 1, 0))):
        with Locations(Location((-16.25, 19.5, 0), (0, 0, 90))):
            Circle(SKETCH16_R)
        with Locations(Location((-16.25, 19.5, 0), (0, 0, 270))):
            Circle(SKETCH16_R_2, mode=Mode.SUBTRACT)
    extrude(amount=BOSS_EXTRUDE8_DEPTH)

    # Sketch17 → Cut-Extrude9 (cut)
    with BuildSketch(Plane(origin=(0, 0, 0), x_dir=(1, 0, 0), z_dir=(0, 1, 0)).offset(CUT_EXTRUDE9_START)):
        Rectangle(SKETCH17_W, SKETCH17_H)
        with Locations(Location((-16.25, 19.5, 0), (0, 0, 270))):
            Circle(SKETCH17_R, mode=Mode.SUBTRACT)
        with Locations(Location((0.245140852, 21.1, 0), (0, 0, 270))):
            Circle(SKETCH17_R_2, mode=Mode.SUBTRACT)
        with Locations(Location((0.245140852, 6.1, 0), (0, 0, 270))):
            Circle(SKETCH17_R_2, mode=Mode.SUBTRACT)
        with Locations((14.15, 13.375)):
            Rectangle(SKETCH17_W_2, SKETCH17_H_2, mode=Mode.SUBTRACT)
        with Locations((-3.5, 14.5)):
            Rectangle(SKETCH17_W_3, SKETCH17_H_3, mode=Mode.SUBTRACT)
    extrude(amount=CUT_EXTRUDE9_DEPTH, mode=Mode.SUBTRACT)

    # Sketch18 → Cut-Extrude10 (cut)
    with BuildSketch(Plane(origin=(0, 3.5, 0), x_dir=(1, 0, 0), z_dir=(0, 1, 0)).offset(CUT_EXTRUDE10_START)):
        with Locations((0.245140852, 21.1)):
            Circle(SKETCH18_R)
        with Locations((0.245140852, 6.1)):
            Circle(SKETCH18_R)
    extrude(amount=CUT_EXTRUDE10_DEPTH, mode=Mode.SUBTRACT)

    # Sketch19 → Boss-Extrude9 (add)
    with BuildSketch(Plane.XZ.offset(2)):
        with Locations((14.15, -13.375)):
            Rectangle(SKETCH19_W, SKETCH19_H)
    extrude(amount=-BOSS_EXTRUDE9_DEPTH)

    # Sketch20 → Cut-Extrude11 (cut)
    with BuildSketch(Plane(origin=(0, 3, 0), x_dir=(1, 0, 0), z_dir=(0, 1, 0)).offset(CUT_EXTRUDE11_START)):
        with Locations((-16.25, 19.5)):
            Circle(SKETCH20_R)
    extrude(amount=CUT_EXTRUDE11_DEPTH, mode=Mode.SUBTRACT)

    # Sketch23 → Cut-Extrude12 (cut, through all)
    with BuildSketch(Plane(origin=(0, -1, 0), x_dir=(1, 0, 0), z_dir=(0, 1, 0))):
        with Locations((-16.375, 14)):
            Rectangle(SKETCH23_W, SKETCH23_H)
    extrude(amount=-CUT_EXTRUDE12_DEPTH, mode=Mode.SUBTRACT)

    # Sketch26 → Boss-Extrude10 (add)
    with BuildSketch(Plane(origin=(0, -1, 0), x_dir=(1, 0, 0), z_dir=(0, 1, 0))):
        with Locations((-2.25, 22.5)):
            Rectangle(SKETCH26_W, SKETCH26_H)
        with Locations((15.75, 22.5)):
            Rectangle(SKETCH26_W, SKETCH26_H)
    extrude(amount=BOSS_EXTRUDE10_DEPTH)


solid = part.part
